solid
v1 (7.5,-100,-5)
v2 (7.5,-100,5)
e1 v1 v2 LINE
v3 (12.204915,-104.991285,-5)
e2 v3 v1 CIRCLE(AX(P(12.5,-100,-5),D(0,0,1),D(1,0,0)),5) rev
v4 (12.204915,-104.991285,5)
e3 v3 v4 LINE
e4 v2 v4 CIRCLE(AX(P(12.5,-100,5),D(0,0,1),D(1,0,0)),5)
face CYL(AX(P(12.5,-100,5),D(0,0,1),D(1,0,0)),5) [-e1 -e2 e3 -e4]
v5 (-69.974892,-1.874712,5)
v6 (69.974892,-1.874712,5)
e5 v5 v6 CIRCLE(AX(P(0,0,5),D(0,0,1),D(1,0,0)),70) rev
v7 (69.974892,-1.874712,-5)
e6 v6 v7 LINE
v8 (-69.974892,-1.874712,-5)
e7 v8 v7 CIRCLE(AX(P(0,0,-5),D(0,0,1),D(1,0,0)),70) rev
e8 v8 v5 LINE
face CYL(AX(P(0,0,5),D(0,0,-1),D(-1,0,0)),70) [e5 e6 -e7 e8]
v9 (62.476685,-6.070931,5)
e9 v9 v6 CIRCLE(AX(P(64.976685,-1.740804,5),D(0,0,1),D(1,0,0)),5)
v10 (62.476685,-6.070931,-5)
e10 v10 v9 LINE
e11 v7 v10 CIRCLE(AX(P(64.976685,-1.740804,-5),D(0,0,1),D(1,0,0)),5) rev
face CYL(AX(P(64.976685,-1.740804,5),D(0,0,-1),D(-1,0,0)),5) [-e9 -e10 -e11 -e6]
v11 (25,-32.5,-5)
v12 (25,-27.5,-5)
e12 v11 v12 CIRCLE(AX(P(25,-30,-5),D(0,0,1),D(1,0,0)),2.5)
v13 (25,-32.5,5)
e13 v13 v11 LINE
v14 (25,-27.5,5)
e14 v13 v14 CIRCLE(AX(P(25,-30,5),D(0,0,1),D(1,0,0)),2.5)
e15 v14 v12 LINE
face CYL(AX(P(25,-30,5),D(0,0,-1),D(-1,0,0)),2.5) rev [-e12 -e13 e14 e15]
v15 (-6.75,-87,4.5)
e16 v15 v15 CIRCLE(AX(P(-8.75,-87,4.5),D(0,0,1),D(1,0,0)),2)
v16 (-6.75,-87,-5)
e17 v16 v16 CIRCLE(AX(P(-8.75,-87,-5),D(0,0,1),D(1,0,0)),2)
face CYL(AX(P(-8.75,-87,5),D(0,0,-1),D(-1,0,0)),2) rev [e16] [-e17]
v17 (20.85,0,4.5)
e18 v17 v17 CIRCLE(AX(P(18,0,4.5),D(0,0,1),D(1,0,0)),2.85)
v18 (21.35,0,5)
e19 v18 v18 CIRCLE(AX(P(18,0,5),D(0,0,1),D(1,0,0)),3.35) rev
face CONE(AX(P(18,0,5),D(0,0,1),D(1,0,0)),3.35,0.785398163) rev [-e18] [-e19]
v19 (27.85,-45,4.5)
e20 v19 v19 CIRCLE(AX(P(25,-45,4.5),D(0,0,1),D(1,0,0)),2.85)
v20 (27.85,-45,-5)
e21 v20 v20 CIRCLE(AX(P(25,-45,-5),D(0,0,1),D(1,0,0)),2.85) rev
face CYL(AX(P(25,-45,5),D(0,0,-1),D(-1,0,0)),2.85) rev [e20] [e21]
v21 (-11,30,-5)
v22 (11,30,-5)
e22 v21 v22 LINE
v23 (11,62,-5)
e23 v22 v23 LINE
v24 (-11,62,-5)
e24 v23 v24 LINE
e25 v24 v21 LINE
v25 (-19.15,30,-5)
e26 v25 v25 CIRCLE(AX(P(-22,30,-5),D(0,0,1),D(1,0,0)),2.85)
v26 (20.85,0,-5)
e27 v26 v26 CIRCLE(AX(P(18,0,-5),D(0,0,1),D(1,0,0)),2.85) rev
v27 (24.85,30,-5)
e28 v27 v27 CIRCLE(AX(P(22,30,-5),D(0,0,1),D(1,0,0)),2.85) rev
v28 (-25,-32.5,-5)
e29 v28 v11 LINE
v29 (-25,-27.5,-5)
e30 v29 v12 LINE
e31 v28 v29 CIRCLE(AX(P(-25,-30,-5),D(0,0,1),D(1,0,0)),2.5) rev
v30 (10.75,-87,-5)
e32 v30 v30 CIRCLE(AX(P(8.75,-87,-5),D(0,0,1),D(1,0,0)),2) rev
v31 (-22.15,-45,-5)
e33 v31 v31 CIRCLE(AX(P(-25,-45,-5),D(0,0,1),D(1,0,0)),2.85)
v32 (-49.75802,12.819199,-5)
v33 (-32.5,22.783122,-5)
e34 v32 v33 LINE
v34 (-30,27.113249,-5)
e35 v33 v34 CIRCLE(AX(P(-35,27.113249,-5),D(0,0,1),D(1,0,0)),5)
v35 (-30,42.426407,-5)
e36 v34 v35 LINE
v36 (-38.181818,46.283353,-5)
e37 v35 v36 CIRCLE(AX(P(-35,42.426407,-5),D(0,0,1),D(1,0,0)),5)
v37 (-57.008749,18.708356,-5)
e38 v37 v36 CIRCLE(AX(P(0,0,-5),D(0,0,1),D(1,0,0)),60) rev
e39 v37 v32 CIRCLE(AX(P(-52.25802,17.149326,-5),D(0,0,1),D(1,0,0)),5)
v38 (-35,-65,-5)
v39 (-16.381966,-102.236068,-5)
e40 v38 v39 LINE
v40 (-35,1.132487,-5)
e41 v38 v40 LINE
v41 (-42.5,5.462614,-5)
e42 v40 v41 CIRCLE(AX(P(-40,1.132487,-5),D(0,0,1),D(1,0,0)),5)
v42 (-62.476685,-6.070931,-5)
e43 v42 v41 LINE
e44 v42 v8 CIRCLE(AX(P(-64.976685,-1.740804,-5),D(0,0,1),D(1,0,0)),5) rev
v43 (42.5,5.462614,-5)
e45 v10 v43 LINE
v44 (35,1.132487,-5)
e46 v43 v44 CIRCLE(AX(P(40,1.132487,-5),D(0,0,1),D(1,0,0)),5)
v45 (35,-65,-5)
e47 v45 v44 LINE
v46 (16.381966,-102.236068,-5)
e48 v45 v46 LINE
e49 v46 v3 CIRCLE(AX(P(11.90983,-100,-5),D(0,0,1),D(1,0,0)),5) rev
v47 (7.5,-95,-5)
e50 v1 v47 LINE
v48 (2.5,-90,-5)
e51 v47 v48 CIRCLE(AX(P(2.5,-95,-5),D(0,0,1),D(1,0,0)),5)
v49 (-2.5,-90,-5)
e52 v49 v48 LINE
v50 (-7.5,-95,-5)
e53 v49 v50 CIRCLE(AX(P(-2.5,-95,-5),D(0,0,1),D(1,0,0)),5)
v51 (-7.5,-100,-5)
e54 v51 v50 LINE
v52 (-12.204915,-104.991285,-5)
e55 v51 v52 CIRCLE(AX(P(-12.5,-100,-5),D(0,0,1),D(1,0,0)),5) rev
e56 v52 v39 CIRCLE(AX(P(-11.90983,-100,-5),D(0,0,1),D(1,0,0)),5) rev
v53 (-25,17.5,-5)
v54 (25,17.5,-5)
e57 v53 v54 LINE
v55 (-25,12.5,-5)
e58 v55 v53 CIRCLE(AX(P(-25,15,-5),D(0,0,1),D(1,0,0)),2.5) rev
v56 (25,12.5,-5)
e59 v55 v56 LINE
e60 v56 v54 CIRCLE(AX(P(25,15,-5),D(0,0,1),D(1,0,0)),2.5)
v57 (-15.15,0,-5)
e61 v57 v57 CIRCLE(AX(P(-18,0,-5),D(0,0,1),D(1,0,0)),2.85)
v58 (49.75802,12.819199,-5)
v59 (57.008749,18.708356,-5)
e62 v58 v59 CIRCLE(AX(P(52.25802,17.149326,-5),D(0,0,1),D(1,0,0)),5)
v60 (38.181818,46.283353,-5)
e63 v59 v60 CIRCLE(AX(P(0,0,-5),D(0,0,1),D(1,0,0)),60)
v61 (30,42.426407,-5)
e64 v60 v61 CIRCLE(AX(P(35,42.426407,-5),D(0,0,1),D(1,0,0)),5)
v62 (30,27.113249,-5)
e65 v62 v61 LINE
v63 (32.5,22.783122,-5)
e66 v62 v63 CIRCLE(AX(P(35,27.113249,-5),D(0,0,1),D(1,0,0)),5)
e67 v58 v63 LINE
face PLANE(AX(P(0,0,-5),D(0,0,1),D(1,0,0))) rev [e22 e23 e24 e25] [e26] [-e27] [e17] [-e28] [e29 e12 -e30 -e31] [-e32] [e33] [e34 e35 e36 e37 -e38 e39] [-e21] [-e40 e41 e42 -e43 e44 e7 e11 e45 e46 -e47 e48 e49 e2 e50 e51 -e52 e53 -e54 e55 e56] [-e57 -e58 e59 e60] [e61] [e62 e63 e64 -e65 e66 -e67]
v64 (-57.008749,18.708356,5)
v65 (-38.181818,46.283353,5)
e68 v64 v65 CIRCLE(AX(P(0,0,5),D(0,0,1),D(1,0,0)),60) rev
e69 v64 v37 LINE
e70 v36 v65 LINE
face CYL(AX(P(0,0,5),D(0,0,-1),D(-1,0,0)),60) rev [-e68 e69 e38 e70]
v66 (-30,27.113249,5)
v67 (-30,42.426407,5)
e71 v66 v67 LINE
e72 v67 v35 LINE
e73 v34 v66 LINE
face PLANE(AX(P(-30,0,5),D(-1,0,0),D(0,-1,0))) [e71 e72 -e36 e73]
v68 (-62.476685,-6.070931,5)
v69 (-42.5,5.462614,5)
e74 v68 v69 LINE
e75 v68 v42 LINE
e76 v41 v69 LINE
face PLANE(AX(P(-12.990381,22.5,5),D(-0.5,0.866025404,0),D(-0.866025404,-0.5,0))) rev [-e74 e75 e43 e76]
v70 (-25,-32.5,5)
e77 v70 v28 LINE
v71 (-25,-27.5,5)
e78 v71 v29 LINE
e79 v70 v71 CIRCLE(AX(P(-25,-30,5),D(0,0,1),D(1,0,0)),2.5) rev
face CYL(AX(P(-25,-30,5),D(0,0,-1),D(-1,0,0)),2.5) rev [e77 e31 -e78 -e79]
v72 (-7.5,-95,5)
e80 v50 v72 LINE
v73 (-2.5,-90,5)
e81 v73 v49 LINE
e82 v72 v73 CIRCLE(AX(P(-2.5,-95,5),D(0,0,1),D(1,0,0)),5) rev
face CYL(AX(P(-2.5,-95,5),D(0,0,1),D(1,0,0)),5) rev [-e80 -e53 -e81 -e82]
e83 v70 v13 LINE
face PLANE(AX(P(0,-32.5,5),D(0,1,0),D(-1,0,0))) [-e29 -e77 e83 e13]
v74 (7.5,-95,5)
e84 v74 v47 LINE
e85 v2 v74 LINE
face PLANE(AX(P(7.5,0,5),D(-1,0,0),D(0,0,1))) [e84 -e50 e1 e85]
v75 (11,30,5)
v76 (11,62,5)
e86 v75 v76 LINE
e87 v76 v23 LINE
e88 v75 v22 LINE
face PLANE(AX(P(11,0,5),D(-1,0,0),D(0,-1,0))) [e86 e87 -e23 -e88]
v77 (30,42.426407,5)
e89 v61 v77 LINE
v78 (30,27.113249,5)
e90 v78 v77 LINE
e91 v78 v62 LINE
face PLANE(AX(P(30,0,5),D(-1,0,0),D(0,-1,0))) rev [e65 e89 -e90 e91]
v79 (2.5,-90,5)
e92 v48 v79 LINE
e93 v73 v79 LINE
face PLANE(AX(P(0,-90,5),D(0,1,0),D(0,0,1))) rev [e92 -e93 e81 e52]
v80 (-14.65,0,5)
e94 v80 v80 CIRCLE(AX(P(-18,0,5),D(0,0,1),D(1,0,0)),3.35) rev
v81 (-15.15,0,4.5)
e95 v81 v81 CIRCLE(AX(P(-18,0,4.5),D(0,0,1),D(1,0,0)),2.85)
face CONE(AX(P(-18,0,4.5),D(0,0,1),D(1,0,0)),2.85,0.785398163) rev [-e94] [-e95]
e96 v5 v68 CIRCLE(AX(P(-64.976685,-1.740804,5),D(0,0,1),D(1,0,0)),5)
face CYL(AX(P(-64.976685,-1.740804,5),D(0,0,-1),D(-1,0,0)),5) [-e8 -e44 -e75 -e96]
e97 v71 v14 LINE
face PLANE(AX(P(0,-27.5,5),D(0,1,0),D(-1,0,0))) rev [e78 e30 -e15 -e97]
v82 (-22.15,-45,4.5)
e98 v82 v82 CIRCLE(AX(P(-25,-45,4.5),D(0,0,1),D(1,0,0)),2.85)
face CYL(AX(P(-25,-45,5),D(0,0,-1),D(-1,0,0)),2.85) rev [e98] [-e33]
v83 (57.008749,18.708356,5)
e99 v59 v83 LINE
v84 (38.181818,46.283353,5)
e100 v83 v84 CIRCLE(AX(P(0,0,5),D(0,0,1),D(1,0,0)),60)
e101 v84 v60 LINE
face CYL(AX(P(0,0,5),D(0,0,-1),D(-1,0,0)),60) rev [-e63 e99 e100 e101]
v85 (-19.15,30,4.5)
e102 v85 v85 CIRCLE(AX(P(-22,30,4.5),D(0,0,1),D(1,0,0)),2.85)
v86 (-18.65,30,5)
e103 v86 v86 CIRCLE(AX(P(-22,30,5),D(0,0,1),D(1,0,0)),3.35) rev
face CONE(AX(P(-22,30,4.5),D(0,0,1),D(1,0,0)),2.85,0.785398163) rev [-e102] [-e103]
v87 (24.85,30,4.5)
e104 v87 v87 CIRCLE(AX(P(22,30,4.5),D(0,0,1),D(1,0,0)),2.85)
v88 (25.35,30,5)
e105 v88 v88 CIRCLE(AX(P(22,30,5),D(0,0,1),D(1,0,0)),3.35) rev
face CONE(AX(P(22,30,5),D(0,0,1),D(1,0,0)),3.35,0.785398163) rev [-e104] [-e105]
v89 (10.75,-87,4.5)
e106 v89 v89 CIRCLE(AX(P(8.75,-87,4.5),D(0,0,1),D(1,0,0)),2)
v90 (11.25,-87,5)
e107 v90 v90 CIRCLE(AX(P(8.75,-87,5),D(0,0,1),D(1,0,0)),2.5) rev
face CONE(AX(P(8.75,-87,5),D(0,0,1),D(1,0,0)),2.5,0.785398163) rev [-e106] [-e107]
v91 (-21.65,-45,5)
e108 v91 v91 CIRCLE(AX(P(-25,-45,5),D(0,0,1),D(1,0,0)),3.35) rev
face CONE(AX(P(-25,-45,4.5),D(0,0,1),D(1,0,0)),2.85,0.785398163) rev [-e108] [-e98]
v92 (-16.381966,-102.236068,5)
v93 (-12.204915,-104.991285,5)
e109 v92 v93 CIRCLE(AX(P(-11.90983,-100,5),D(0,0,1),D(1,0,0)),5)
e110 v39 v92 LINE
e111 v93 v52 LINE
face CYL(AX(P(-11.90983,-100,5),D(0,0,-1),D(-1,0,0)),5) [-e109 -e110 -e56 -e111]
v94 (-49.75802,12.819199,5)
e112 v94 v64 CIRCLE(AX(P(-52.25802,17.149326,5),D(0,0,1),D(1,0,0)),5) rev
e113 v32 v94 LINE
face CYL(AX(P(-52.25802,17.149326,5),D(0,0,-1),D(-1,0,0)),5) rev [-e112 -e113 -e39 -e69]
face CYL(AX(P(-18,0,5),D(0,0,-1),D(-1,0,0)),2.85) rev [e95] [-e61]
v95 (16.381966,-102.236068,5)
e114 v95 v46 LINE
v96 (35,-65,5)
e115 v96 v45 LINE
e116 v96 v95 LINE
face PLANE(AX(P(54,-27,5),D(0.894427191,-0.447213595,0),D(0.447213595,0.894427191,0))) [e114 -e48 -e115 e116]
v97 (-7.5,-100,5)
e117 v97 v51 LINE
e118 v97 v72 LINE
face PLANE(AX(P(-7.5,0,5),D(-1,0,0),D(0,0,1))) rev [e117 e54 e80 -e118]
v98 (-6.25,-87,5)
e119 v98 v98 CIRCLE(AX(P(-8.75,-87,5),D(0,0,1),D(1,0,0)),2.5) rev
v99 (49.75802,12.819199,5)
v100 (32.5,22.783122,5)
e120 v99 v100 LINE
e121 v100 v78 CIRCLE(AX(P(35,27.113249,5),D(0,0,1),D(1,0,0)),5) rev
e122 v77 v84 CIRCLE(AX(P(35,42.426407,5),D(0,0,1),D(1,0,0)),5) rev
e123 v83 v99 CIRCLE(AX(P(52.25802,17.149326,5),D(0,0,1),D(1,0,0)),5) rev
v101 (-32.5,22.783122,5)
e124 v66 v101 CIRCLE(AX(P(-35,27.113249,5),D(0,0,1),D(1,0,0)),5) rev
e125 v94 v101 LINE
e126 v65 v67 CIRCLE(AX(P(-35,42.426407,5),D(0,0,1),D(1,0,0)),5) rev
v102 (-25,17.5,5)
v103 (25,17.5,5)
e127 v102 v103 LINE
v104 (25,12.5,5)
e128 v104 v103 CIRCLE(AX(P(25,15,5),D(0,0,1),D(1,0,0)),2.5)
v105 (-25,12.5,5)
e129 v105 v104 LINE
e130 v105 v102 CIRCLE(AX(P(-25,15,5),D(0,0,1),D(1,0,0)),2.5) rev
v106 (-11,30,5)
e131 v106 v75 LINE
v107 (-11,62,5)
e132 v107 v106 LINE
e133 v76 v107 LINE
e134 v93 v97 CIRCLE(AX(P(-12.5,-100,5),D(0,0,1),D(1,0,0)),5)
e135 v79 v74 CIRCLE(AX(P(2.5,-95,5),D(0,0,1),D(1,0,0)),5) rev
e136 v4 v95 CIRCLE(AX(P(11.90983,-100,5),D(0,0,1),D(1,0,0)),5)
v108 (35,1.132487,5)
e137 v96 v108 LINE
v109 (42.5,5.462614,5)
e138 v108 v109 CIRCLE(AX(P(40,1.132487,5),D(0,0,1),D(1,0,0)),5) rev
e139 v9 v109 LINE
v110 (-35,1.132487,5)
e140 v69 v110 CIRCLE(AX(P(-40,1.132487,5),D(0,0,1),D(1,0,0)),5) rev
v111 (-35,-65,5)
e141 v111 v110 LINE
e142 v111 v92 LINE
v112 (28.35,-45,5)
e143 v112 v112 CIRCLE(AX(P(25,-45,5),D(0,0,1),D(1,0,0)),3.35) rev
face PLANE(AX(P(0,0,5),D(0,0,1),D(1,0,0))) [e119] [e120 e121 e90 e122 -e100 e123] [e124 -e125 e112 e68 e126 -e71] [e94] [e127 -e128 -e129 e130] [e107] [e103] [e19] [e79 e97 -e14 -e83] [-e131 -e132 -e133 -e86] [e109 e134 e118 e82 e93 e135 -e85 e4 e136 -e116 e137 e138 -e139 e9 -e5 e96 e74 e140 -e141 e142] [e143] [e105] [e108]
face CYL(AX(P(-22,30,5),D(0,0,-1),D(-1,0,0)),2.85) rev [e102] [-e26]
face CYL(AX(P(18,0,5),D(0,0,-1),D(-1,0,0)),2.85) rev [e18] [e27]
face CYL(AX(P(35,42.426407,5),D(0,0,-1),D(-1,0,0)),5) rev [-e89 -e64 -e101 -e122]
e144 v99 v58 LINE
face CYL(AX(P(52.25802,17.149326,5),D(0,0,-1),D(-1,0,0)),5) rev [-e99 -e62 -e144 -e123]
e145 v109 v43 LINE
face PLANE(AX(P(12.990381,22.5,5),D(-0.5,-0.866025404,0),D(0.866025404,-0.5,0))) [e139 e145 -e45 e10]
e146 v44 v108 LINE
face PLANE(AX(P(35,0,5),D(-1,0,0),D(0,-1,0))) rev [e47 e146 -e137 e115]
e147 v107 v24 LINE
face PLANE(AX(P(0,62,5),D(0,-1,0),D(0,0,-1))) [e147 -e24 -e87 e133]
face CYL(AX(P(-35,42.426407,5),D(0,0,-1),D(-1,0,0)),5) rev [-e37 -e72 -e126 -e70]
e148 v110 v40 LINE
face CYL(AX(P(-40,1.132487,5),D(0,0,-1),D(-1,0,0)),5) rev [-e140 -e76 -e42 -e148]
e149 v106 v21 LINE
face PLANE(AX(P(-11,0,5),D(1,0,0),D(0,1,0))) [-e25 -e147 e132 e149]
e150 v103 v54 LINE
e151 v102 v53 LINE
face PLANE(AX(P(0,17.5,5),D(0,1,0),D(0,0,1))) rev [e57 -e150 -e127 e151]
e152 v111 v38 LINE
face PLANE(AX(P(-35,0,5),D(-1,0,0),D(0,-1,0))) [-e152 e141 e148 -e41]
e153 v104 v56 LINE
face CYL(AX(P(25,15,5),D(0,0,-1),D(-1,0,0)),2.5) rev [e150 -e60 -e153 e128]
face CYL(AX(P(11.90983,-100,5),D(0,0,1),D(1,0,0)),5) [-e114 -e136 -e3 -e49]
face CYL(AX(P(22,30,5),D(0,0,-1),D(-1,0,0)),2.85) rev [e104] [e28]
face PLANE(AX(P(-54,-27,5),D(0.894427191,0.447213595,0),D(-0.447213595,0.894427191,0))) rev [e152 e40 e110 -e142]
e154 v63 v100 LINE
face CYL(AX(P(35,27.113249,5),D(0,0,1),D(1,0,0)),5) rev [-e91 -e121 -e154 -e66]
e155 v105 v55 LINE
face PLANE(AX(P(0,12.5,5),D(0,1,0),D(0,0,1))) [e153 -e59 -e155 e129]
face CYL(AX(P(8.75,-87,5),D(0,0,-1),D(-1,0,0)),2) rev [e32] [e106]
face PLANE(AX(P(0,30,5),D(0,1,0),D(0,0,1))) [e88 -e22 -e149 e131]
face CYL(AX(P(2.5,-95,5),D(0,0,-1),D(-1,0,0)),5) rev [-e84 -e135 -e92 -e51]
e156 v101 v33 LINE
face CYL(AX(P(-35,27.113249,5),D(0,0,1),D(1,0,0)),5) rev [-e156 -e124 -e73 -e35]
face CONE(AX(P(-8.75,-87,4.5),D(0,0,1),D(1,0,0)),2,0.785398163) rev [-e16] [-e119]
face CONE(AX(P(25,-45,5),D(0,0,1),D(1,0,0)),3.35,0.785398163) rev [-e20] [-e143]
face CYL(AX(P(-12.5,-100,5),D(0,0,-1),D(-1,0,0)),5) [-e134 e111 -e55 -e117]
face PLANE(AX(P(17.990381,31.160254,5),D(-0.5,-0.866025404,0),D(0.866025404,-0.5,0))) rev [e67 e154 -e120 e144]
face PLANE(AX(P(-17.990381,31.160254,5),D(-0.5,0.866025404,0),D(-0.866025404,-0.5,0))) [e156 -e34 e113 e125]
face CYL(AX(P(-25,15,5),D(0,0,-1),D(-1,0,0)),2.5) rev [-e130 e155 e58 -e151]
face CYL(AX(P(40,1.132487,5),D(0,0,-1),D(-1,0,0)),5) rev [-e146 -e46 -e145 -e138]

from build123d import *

# Parameters (mm, degrees)
SKETCH4_R           = 2
SKETCH4_R_2         = 2.85
SKETCH4_W           = 22
SKETCH4_H           = 32
BOSS_EXTRUDE1_DEPTH = 5
FILLET1_R           = 5
CHAMFER1_SIZE       = 0.5


with BuildPart() as part:
    # Sketch4 → Boss-Extrude1 (new, symmetric)
    with BuildSketch(Plane.XY):
        with BuildLine():
            ThreePointArc((69.282032303, -10), (0, 70), (-69.282032303, -10))
            Line((-69.282032303, -10), (-35, 9.792740578))
            Line((-35, 9.792740578), (-35, -55))
            Line((-35, -55), (-35, -65))
            Line((-35, -65), (-15, -105))
            Line((-15, -105), (-7.5, -105))
            Line((-7.5, -105), (-7.5, -90))
            Line((-7.5, -90), (7.5, -90))
            Line((7.5, -90), (7.5, -105))
            Line((7.5, -105), (15, -105))
            Line((15, -105), (35, -65))
            Line((35, -65), (35, 9.792740578))
            Line((35, 9.792740578), (69.282032303, -10))
        make_face()
        with Locations((-8.75, -87)):
            Circle(SKETCH4_R, mode=Mode.SUBTRACT)
        with Locations((-25, -45)):
            Circle(SKETCH4_R_2, mode=Mode.SUBTRACT)
        with Locations((8.75, -87)):
            Circle(SKETCH4_R, mode=Mode.SUBTRACT)
        with Locations((25, -45)):
            Circle(SKETCH4_R_2, mode=Mode.SUBTRACT)
        with BuildLine():
            Line((25, -32.5), (-25, -32.5))
            ThreePointArc((-25, -32.5), (-27.5, -30), (-25, -27.5))
            Line((-25, -27.5), (25, -27.5))
            ThreePointArc((25, -27.5), (27.5, -30), (25, -32.5))
        make_face(mode=Mode.SUBTRACT)
        with Locations((-18, 0)):
            Circle(SKETCH4_R_2, mode=Mode.SUBTRACT)
        with BuildLine():
            Line((-30, 24.226497308), (-59.572090597, 7.153042841))
            ThreePointArc((-59.572090597, 7.153042841), (-50.077338732, 33.04935923), (-30, 51.961524227))
            Line((-30, 51.961524227), (-30, 24.226497308))
        make_face(mode=Mode.SUBTRACT)
        with Locations((-22, 30)):
            Circle(SKETCH4_R_2, mode=Mode.SUBTRACT)
        with Locations((0, 46)):
            Rectangle(SKETCH4_W, SKETCH4_H, mode=Mode.SUBTRACT)
        with Locations((18, 0)):
            Circle(SKETCH4_R_2, mode=Mode.SUBTRACT)
        with BuildLine():
            Line((25, 12.5), (-25, 12.5))
            ThreePointArc((-25, 12.5), (-27.5, 15), (-25, 17.5))
            Line((-25, 17.5), (25, 17.5))
            ThreePointArc((25, 17.5), (27.5, 15), (25, 12.5))
        make_face(mode=Mode.SUBTRACT)
        with Locations((22, 30)):
            Circle(SKETCH4_R_2, mode=Mode.SUBTRACT)
        with BuildLine():
            Line((59.572090597, 7.153042841), (30, 24.226497308))
            Line((30, 24.226497308), (30, 51.961524227))
            ThreePointArc((30, 51.961524227), (50.077338732, 33.04935923), (59.572090597, 7.153042841))
        make_face(mode=Mode.SUBTRACT)
    extrude(amount=BOSS_EXTRUDE1_DEPTH, both=True)

    # Fillet1
    # the kernel refuses this fillet: 5 mm, written as the material it adds along each edge
    with BuildSketch(Plane(origin=(59.572090597, 7.153042841, -5), x_dir=(-0.8660254037844397, 0.49999999999999806, 0), z_dir=(0, 0, 1))) as fillet1_piece_1:
        with BuildLine():
            CenterArc((11.332313176, -5), FILLET1_R, 90, 138.168098297)
            ThreePointArc((7.997575975, -8.725523829), (3.783101322, -4.560454399), (0, 0))
            Line((0, 0), (11.332313176, 0))
        make_face()
    extrude(amount=10)
    with BuildSketch(Plane(origin=(30, 24.226497308, 5), x_dir=(0, 1, 0), z_dir=(0, 0, -1))) as fillet1_piece_2:
        with BuildLine():
            CenterArc((FILLET1_R * 0.57735026919, FILLET1_R), FILLET1_R, 210, 60)
            Line((-FILLET1_R * 0.288675134595, FILLET1_R * 0.5), (0, 0))
            Line((0, 0), (FILLET1_R * 0.57735026919, 0))
        make_face()
    extrude(amount=10)
    with BuildSketch(Plane(origin=(30, 51.961524227, -5), x_dir=(0, -1, 0), z_dir=(0, 0, 1))) as fillet1_piece_3:
        with BuildLine():
            CenterArc((9.535117356, 5), FILLET1_R, 140.478803641, 129.521196359)
            ThreePointArc((5.678171277, 8.181818182), (2.669034839, 4.208924127), (0, 0))
            Line((0, 0), (9.535117356, 0))
        make_face()
    extrude(amount=10)
    with BuildSketch(Plane(origin=(-59.572090597, 7.153042841, 5), x_dir=(0.2165677144201491, 0.9762675991094004, 0), z_dir=(0, 0, -1))) as fillet1_piece_4:
        with BuildLine():
            CenterArc((11.343039457, 4.975618333), FILLET1_R, 137.492482071, 138.168098297)
            Line((7.657096034, 8.354053043), (0, 0))
            ThreePointArc((0, 0), (5.918107543, -0.29258), (11.836215086, 0))
        make_face()
    extrude(amount=10)
    with BuildSketch(Plane(origin=(-30, 24.226497308, -5), x_dir=(-0.8660254037844397, -0.49999999999999795, 0), z_dir=(0, 0, 1))) as fillet1_piece_5:
        with BuildLine():
            CenterArc((FILLET1_R * 0.57735026919, -FILLET1_R), FILLET1_R, 90, 60)
            Line((-FILLET1_R * 0.288675134595, -FILLET1_R * 0.5), (0, 0))
            Line((0, 0), (FILLET1_R * 0.57735026919, 0))
        make_face()
    extrude(amount=10)
    with BuildSketch(Plane(origin=(-30, 51.961524227, -5), x_dir=(-0.8215414898046486, -0.5701487354450225, 0), z_dir=(0, 0, 1))) as fillet1_piece_6:
        with BuildLine():
            CenterArc((9.544142552, 4.982750841), FILLET1_R, 145.239401821, 129.521196359)
            Line((5.436435103, 7.833494518), (0, 0))
            ThreePointArc((0, 0), (4.979552636, -0.206989911), (9.959105271, 0))
        make_face()
    extrude(amount=10)
    with BuildSketch(Plane(origin=(35, 9.792740578, -5), x_dir=(0.8660254037844399, -0.49999999999999795, 0), z_dir=(0, 0, 1)), Plane(origin=(-35, 9.792740578, -5), x_dir=(0, -1, 0), z_dir=(0, 0, 1))) as fillet1_piece_7:
        with BuildLine():
            CenterArc((FILLET1_R * 1.73205080757, -FILLET1_R), FILLET1_R, 90, 120)
            Line((FILLET1_R * 0.866025403784, -FILLET1_R * 1.5), (0, 0))
            Line((0, 0), (FILLET1_R * 1.73205080757, 0))
        make_face()
    extrude(amount=10)
    with BuildSketch(Plane(origin=(7.5, -90, 5), x_dir=(0, -1, 0), z_dir=(0, 0, -1)), Plane(origin=(-7.5, -90, 5), x_dir=(1, 0, 0), z_dir=(0, 0, -1))) as fillet1_piece_8:
        with BuildLine():
            CenterArc((FILLET1_R, FILLET1_R), FILLET1_R, 180, 90)
            Line((0, FILLET1_R), (0, 0))
            Line((0, 0), (FILLET1_R, 0))
        make_face()
    extrude(amount=10)
    # the kernel refuses this fillet: 5 mm, written as the material it takes off along each edge
    with BuildSketch(Plane(origin=(-69.282032303, -10, -25.386938297), x_dir=(-0.08496362878818808, 0.9963840533565073, 0), z_dir=(0, 0, 1))) as fillet1_2_piece_1:
        with BuildLine():
            CenterArc((7.863533343, -4.991510604), FILLET1_R, 86.660722685, 118.465343928)
            Line((3.33665476, -7.114567433), (0, 0))
            ThreePointArc((0, 0), (4.077387659, 0.118851542), (8.154775319, 0))
        make_face()
    extrude(amount=50.773876593, mode=Mode.SUBTRACT)
    with BuildSketch(Plane(origin=(69.282032303, -10, -25.386938297), x_dir=(-0.8660254037844397, 0.4999999999999982, 0), z_dir=(0, 0, 1))) as fillet1_2_piece_2:
        with BuildLine():
            CenterArc((7.858138122, -5), FILLET1_R, 90, 118.465343928)
            ThreePointArc((3.462610285, -7.383135547), (1.623699843, -3.742033489), (0, 0))
            Line((0, 0), (7.858138122, 0))
        make_face()
    extrude(amount=50.773876593, mode=Mode.SUBTRACT)
    with BuildSketch(Plane(origin=(15, -105, -12.725424859), x_dir=(-1, 0, 0), z_dir=(0, 0, 1)), Plane(origin=(-15, -105, -12.725424859), x_dir=(-0.4472135954999598, 0.894427190999915, 0), z_dir=(0, 0, 1))) as fillet1_2_piece_3:
        with BuildLine():
            CenterArc((FILLET1_R * 0.61803398875, -FILLET1_R), FILLET1_R, 90, 63.434948823)
            Line((-FILLET1_R * 0.27639320225, -FILLET1_R * 0.5527864045), (0, 0))
            Line((0, 0), (FILLET1_R * 0.61803398875, 0))
        make_face()
    extrude(amount=25.450849719, mode=Mode.SUBTRACT)
    with BuildSketch(Plane(origin=(7.5, -105, -17.5), x_dir=(0, 1, 0), z_dir=(0, 0, 1))) as fillet1_2_piece_4:
        with BuildLine():
            CenterArc((FILLET1_R, -FILLET1_R), FILLET1_R, 90, 90)
            Line((0, -FILLET1_R), (0, 0))
            Line((0, 0), (FILLET1_R, 0))
        make_face()
    extrude(amount=35, mode=Mode.SUBTRACT)
    with BuildSketch(Plane(origin=(-7.5, -105, 17.5), x_dir=(-1, 0, 0), z_dir=(0, 0, -1))) as fillet1_2_piece_5:
        with BuildLine():
            CenterArc((FILLET1_R, FILLET1_R), FILLET1_R, 180, 90)
            Line((0, FILLET1_R), (0, 0))
            Line((0, 0), (FILLET1_R, 0))
        make_face()
    extrude(amount=35, mode=Mode.SUBTRACT)

    # Chamfer1
    chamfer1_edges = [part.edges().sort_by_distance(p)[0] for p in [
        (22.15, -45, 5),
        (19.15, 30, 5),
        (15.15, 0, 5),
        (6.75, -87, 5),
        (-10.75, -87, 5),
        (-24.85, 30, 5),
        (-20.85, 0, 5),
        (-27.85, -45, 5),
    ]]
    chamfer(chamfer1_edges, length=CHAMFER1_SIZE)


solid = part.part
